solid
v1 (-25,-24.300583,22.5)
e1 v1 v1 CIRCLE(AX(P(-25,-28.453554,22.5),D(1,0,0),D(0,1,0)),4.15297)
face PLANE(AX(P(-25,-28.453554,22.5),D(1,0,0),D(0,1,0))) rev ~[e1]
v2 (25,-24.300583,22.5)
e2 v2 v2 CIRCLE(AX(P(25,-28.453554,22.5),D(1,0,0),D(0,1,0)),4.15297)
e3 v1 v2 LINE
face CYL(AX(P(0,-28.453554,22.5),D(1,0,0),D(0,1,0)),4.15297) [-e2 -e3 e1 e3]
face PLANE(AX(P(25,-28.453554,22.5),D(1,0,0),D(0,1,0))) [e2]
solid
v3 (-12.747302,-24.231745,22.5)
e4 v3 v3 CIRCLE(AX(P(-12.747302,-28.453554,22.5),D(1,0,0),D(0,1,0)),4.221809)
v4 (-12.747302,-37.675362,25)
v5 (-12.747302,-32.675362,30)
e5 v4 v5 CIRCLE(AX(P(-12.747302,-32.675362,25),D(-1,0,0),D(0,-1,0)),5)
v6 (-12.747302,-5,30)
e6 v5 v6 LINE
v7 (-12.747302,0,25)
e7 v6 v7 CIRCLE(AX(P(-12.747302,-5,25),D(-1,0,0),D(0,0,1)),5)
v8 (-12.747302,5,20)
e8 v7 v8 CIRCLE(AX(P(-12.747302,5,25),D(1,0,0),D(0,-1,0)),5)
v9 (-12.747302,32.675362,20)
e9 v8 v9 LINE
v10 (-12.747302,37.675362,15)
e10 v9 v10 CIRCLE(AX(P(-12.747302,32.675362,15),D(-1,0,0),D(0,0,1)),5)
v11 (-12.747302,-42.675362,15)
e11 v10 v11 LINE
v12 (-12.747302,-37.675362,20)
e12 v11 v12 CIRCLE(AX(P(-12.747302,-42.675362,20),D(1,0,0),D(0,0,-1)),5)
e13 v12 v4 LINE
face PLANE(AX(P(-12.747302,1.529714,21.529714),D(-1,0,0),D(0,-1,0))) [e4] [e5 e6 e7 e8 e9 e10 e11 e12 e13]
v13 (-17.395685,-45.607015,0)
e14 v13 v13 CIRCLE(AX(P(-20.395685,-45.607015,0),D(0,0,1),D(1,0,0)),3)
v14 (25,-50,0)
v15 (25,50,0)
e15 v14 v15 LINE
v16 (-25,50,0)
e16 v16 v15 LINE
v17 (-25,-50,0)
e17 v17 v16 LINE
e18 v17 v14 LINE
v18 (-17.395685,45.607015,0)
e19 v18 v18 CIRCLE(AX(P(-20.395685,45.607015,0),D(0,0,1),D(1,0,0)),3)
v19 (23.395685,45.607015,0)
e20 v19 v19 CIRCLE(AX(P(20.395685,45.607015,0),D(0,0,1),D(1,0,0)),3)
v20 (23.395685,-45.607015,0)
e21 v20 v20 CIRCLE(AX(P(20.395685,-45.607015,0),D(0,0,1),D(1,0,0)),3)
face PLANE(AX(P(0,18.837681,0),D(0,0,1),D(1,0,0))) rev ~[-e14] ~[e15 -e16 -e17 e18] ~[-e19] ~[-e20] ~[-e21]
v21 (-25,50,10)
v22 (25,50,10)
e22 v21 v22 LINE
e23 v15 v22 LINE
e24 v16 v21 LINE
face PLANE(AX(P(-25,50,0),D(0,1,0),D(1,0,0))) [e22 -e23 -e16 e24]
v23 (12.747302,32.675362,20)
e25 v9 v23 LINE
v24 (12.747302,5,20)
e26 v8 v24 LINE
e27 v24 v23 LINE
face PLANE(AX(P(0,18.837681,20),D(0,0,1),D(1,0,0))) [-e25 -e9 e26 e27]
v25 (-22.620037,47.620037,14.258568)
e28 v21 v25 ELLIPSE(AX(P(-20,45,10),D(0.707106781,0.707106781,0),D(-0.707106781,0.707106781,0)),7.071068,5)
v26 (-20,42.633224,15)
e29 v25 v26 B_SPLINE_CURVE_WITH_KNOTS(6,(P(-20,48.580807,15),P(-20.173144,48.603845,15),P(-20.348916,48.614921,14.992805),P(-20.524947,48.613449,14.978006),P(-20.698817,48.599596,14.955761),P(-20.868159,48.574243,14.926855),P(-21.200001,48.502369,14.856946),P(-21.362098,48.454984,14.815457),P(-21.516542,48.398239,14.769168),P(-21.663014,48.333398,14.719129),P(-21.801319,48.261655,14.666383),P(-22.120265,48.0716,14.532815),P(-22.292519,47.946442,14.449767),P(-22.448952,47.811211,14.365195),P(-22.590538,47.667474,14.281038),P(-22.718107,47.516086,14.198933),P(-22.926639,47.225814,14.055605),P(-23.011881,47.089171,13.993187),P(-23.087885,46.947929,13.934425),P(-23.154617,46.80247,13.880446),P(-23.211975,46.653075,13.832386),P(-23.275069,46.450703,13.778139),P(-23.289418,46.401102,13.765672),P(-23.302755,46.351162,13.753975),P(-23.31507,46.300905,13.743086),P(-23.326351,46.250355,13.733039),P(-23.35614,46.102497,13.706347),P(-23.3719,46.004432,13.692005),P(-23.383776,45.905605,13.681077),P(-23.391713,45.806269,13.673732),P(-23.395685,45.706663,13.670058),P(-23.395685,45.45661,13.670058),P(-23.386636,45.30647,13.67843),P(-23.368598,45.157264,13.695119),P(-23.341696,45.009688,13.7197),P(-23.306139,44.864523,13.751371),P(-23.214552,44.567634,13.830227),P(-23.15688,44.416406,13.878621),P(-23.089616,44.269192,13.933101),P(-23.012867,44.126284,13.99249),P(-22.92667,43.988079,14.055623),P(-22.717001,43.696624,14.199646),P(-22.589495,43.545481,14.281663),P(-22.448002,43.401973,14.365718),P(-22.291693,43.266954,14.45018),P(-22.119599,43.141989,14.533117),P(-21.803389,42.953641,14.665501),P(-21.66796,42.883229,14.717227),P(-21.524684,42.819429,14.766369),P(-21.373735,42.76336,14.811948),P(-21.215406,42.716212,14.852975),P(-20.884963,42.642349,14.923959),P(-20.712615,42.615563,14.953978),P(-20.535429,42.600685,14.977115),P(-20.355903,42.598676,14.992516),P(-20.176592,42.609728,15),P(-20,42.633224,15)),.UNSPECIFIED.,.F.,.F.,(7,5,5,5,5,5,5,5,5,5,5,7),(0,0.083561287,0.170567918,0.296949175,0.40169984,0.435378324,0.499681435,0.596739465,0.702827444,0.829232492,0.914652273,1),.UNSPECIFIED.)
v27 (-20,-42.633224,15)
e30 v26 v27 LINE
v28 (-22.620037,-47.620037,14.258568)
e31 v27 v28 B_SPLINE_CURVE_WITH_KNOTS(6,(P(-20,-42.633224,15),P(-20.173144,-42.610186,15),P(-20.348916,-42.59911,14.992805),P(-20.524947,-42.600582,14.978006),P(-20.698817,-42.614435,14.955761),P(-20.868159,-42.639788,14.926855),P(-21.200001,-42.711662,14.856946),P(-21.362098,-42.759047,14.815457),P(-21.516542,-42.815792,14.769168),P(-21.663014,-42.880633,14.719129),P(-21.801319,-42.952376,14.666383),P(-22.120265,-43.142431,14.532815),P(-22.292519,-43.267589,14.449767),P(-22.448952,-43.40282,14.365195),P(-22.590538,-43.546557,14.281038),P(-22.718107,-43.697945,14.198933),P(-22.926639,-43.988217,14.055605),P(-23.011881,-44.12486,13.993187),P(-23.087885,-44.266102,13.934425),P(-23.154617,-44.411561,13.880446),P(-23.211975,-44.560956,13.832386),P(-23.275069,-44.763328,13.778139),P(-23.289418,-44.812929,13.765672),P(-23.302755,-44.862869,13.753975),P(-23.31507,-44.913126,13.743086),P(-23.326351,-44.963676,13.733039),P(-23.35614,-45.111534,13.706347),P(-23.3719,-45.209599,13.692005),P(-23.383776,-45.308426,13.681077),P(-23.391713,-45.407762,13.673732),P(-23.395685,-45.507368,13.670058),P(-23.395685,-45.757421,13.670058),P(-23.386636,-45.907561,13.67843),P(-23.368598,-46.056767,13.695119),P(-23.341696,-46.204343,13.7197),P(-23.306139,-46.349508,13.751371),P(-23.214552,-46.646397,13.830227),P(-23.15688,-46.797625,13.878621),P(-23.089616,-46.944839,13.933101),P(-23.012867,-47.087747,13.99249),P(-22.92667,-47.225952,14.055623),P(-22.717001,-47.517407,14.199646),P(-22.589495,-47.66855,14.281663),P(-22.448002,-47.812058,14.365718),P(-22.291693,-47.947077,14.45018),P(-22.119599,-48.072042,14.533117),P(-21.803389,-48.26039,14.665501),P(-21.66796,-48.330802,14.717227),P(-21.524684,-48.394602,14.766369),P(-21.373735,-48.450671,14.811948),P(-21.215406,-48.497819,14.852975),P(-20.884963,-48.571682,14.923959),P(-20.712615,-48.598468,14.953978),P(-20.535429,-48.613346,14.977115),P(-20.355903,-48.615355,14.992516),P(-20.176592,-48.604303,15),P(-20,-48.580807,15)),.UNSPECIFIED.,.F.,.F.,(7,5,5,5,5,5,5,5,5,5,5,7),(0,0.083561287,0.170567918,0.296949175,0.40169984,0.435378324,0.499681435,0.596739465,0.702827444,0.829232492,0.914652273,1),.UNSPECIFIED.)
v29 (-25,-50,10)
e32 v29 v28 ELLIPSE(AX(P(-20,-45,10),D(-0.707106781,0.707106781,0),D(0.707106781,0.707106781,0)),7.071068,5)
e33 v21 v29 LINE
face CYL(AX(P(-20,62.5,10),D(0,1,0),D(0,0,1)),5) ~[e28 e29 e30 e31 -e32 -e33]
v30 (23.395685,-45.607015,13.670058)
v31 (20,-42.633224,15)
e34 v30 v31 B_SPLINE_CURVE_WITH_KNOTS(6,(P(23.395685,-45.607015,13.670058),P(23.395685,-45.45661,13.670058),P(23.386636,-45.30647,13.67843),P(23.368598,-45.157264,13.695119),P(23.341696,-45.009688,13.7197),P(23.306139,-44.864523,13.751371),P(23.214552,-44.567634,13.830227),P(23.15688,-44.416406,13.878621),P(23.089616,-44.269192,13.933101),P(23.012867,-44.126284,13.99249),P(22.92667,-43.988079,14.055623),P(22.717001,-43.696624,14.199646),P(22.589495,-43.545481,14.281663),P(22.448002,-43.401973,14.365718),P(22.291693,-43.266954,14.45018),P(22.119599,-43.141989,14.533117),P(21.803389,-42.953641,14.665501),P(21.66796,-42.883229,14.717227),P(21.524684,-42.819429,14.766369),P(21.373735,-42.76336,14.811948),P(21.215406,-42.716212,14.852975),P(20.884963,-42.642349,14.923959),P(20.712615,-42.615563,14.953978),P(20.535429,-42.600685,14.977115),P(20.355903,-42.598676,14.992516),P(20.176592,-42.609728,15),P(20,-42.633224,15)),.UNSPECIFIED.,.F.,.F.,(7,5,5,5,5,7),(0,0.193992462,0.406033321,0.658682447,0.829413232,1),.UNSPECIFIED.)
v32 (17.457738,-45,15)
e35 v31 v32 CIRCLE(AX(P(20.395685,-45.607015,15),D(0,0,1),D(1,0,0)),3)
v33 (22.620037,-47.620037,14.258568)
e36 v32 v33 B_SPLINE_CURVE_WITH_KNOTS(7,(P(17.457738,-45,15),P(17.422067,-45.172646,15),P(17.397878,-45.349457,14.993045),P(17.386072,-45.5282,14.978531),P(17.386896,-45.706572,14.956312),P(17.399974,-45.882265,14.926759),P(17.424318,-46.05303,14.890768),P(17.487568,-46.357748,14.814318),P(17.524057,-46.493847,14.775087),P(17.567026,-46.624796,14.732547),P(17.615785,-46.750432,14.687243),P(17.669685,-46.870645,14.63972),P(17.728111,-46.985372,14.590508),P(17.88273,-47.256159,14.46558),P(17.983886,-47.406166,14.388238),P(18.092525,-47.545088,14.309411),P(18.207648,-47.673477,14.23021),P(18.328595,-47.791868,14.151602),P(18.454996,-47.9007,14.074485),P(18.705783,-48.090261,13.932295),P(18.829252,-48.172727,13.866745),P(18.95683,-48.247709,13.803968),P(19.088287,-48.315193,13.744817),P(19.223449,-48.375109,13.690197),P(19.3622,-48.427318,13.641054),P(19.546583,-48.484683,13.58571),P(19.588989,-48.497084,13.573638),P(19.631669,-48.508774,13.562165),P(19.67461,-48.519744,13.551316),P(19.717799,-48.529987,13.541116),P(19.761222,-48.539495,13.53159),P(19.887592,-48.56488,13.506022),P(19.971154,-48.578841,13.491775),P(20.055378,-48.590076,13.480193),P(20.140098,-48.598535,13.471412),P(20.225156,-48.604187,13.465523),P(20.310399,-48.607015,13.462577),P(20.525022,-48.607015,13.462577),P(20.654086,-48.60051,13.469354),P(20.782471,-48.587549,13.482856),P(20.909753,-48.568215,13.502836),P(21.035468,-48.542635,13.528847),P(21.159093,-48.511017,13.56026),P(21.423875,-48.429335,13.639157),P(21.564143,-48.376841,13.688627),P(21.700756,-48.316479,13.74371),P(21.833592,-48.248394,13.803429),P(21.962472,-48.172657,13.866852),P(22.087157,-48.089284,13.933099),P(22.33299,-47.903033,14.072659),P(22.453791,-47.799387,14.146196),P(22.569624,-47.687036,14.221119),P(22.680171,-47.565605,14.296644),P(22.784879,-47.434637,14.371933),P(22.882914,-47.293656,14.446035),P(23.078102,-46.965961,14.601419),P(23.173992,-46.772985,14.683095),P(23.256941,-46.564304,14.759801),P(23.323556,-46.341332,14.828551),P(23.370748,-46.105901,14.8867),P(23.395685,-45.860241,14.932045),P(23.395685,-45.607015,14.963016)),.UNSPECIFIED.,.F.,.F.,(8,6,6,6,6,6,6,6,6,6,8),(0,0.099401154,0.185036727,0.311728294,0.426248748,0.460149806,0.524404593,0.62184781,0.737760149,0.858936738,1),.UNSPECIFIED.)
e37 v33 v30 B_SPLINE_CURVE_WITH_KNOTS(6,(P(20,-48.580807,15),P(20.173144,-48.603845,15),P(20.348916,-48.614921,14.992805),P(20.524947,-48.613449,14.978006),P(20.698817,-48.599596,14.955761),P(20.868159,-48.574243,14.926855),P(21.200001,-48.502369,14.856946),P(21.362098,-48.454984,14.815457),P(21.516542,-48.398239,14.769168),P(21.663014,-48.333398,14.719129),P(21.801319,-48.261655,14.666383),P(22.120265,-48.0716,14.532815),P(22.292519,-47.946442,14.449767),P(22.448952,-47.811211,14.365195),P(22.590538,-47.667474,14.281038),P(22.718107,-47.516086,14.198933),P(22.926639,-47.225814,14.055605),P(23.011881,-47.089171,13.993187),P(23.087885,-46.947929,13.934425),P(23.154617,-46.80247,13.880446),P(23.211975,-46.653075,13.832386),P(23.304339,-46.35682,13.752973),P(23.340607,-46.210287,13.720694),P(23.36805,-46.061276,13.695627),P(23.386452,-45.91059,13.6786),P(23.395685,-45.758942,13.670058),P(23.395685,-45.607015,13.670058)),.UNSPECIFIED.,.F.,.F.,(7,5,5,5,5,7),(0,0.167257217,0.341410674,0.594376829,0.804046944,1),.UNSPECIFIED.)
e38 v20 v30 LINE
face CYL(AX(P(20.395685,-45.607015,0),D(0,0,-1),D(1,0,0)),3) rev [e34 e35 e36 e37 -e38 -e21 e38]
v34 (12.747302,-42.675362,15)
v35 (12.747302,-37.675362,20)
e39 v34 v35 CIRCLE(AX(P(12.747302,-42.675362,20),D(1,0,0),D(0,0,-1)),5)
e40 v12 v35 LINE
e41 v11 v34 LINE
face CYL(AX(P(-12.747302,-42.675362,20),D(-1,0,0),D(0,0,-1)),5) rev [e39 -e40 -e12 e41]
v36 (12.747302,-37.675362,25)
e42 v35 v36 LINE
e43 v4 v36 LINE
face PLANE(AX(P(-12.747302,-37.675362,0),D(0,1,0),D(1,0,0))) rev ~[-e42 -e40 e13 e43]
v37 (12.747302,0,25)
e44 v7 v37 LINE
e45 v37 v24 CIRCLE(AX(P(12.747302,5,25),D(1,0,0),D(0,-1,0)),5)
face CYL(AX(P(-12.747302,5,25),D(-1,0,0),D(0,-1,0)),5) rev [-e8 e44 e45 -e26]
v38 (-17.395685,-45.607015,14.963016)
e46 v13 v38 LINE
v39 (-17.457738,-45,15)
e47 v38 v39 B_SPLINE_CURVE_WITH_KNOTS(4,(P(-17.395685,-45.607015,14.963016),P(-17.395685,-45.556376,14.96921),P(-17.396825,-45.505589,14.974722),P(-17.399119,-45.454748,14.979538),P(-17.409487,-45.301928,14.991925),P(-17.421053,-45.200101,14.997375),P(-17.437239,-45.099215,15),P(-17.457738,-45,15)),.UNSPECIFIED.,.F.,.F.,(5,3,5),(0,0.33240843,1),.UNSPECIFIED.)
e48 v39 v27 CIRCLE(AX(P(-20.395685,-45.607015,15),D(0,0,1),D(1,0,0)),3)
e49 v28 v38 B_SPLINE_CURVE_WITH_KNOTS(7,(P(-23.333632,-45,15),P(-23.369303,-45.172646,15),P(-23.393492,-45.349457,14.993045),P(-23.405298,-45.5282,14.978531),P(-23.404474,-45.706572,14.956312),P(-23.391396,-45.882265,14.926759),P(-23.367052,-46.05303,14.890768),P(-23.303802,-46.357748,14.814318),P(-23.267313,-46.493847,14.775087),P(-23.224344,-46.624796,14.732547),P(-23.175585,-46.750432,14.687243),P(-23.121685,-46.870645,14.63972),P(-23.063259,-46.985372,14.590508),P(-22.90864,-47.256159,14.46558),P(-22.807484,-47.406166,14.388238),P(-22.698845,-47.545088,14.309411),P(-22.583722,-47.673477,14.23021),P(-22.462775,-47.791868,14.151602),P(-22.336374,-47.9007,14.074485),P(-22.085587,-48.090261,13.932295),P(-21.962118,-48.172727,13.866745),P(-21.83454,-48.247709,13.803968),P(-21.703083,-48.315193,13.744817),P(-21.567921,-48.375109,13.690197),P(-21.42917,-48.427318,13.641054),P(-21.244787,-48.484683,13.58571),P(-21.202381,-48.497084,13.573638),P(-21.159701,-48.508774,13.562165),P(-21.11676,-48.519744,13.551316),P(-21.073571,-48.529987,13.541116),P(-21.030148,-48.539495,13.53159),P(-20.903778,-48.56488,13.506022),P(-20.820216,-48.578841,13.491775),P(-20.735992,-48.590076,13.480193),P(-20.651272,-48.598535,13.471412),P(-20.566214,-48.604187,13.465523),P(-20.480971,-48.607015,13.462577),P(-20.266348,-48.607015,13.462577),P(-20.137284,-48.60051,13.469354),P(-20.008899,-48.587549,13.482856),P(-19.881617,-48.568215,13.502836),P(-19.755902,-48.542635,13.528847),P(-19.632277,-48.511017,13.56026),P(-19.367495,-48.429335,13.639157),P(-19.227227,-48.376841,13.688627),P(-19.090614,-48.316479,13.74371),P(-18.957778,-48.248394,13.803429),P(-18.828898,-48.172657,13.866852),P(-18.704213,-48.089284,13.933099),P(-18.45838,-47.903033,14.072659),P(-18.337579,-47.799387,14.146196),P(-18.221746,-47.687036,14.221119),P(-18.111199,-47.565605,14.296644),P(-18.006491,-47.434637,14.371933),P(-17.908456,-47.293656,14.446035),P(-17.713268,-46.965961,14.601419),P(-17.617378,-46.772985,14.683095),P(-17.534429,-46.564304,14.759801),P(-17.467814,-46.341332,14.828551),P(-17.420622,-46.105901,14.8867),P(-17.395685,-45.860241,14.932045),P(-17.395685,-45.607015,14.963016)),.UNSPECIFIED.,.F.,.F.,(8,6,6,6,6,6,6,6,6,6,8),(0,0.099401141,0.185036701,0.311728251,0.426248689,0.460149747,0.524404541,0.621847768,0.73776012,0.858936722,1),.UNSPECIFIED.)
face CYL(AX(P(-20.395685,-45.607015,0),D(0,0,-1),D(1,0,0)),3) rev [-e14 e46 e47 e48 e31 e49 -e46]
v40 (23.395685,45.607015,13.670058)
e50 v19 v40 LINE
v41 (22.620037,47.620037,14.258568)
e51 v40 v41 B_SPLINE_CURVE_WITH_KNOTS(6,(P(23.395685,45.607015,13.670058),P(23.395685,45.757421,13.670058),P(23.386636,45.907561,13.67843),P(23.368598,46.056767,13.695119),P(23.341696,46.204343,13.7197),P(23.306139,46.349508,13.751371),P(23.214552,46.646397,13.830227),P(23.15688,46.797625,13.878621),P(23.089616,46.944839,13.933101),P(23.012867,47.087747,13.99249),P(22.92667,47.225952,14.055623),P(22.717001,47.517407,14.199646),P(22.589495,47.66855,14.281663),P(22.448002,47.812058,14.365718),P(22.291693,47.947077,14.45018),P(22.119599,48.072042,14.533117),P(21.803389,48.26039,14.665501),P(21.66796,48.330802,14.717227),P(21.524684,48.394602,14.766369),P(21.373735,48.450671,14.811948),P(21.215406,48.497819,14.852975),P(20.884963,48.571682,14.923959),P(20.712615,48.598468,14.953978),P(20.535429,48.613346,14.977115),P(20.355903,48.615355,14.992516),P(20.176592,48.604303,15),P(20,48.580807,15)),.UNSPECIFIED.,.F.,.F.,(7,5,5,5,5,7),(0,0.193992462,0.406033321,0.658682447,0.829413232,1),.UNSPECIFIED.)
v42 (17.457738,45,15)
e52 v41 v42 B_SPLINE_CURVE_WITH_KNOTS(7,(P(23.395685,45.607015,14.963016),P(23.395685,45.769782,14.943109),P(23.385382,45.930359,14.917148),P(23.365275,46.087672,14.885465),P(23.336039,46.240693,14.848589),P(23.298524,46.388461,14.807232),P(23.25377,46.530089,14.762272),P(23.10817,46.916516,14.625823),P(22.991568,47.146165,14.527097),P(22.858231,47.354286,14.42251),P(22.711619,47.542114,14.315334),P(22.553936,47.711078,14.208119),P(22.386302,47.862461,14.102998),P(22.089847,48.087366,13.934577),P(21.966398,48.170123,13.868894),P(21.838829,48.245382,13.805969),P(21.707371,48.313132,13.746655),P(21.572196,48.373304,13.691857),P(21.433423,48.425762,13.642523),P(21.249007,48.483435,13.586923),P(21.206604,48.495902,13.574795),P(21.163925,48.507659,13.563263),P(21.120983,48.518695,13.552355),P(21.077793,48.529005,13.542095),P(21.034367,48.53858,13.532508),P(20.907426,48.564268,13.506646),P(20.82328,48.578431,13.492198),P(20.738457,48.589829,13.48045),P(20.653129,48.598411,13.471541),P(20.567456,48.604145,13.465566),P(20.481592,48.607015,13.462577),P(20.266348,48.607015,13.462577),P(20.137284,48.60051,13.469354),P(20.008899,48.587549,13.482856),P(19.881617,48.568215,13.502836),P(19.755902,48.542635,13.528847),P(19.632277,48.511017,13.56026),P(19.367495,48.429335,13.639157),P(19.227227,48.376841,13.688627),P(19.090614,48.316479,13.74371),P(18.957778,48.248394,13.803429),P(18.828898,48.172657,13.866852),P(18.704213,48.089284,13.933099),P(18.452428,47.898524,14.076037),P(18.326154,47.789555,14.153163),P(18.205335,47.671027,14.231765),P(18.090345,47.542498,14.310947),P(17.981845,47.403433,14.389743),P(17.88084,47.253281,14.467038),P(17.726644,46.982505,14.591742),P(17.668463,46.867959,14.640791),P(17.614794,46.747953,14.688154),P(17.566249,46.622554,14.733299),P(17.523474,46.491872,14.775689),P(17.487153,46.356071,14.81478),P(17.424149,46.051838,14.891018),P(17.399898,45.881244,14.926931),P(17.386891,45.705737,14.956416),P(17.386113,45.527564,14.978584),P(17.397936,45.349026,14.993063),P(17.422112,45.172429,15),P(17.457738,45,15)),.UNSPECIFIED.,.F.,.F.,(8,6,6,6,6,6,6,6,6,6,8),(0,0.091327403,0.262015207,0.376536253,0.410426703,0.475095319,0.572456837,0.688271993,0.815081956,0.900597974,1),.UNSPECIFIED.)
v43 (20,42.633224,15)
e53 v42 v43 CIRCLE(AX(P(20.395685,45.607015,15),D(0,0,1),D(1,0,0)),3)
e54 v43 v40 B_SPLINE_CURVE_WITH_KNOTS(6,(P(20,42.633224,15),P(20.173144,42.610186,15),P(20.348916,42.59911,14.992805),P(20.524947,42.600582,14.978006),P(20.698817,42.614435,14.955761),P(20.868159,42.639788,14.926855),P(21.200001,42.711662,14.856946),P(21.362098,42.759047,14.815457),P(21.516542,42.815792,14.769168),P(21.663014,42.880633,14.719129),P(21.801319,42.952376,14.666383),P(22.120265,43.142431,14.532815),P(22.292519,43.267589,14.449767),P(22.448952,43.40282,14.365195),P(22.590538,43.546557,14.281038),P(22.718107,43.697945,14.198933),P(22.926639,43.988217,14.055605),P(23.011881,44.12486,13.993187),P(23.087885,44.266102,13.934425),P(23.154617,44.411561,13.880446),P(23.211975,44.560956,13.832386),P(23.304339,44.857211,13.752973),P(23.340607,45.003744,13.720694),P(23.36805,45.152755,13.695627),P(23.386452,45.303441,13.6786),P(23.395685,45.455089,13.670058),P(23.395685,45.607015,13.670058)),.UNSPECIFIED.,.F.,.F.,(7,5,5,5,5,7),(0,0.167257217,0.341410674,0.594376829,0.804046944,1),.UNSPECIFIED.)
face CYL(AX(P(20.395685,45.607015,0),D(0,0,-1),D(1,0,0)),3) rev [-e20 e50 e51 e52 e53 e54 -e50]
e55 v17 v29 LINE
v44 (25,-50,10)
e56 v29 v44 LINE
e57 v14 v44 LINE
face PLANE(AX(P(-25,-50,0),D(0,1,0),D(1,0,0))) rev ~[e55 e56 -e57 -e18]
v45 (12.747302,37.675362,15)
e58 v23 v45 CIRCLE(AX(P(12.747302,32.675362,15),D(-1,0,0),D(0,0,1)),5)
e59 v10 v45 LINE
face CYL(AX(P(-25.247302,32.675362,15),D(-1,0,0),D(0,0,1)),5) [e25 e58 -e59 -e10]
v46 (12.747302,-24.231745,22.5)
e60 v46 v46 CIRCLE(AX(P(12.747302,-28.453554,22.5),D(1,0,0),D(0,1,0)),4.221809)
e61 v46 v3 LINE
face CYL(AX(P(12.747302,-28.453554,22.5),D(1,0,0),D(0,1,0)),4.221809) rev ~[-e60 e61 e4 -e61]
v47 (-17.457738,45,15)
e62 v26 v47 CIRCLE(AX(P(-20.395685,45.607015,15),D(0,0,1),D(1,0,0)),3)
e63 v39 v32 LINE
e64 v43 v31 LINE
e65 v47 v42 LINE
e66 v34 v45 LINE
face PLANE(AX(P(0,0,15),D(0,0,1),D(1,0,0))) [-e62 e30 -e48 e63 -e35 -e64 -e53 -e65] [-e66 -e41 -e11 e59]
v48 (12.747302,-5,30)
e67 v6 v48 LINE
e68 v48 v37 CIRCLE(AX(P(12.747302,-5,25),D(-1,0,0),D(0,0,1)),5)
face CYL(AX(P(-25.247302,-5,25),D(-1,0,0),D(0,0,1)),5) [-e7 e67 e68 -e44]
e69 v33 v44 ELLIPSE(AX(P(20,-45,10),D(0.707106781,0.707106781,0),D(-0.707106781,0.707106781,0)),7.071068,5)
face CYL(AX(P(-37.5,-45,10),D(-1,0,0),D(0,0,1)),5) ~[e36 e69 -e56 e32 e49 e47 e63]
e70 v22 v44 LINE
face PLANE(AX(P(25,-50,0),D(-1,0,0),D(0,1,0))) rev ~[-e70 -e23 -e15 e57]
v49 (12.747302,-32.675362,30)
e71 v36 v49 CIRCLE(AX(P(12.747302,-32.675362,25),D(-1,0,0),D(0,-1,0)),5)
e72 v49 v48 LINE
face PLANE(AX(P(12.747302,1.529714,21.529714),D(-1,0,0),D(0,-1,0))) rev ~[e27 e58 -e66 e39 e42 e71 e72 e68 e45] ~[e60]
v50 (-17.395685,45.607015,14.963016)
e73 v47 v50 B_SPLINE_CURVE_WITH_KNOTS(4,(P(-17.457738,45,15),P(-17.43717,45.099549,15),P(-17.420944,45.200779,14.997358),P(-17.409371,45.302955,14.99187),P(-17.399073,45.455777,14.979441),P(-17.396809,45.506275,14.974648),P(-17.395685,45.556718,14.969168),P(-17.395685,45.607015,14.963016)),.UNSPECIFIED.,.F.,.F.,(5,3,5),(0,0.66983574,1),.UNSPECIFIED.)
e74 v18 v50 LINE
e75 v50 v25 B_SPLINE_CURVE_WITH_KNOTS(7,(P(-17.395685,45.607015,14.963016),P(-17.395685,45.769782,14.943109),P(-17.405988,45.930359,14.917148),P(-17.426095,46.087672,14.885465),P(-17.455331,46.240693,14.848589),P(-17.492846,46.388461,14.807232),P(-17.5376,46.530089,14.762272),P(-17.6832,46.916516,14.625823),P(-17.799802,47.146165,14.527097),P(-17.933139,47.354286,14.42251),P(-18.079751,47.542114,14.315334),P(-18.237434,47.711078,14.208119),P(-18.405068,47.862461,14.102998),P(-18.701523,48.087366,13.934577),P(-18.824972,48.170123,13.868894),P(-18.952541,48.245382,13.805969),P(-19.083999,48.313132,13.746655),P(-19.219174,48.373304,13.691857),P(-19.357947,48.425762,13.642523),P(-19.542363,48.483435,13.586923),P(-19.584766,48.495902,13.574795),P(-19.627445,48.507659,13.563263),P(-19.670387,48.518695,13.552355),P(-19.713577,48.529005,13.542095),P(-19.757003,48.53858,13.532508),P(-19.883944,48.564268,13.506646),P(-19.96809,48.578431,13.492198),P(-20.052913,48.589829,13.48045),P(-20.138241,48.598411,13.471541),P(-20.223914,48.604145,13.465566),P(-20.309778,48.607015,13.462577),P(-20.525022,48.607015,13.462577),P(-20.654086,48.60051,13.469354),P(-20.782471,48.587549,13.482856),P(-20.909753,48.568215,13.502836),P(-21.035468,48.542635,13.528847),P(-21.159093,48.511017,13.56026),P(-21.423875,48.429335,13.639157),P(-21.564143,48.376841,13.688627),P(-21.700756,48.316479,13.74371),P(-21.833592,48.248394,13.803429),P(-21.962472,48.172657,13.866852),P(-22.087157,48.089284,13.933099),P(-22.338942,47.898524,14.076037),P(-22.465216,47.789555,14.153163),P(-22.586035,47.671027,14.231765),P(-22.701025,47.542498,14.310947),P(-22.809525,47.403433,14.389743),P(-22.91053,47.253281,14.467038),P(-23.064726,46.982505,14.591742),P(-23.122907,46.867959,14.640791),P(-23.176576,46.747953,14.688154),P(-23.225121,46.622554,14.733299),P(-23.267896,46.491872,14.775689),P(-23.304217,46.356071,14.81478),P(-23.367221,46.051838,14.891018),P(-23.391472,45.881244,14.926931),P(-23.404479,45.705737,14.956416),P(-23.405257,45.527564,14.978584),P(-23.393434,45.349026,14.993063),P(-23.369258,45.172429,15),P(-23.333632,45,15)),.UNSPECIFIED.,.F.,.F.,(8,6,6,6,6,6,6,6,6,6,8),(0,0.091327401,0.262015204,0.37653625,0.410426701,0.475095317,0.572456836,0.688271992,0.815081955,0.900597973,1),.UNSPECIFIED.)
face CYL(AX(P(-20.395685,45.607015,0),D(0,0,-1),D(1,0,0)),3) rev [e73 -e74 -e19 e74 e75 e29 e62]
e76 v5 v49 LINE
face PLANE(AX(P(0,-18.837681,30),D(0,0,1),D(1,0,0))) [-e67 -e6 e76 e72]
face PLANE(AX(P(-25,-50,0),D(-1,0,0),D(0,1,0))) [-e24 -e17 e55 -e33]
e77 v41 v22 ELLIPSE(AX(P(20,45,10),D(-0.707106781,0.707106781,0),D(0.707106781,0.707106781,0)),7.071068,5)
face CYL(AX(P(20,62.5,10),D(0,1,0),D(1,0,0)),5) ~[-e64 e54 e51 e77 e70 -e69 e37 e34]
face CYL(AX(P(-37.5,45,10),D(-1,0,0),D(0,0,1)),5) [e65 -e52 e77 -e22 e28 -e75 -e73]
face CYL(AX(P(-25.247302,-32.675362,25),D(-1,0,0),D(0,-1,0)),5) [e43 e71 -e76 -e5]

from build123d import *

# Parameters (mm, degrees)
F0_W        = 50
F0_H        = 100
F0_R        = 3
F1_DEPTH    = 15
F0_W_2      = 25.4946034402
F0_H_2      = 37.6753620803
F2_DEPTH    = 20
F3_DEPTH    = 30
F4_T1_DEPTH = 25.4946034402
F4_T3_DEPTH = 50.4946034402
F4_T5_DEPTH = 125
F4_T7_DEPTH = 75
F5_R        = 4.2218085751
F6_DEPTH    = 31.6
F7_R        = 4.1529704456
F8_DEPTH    = 25


# Not quite as in the source:
# - a fillet or chamfer that OpenCascade refuses, or shapes differently, is made with other operations: its cross-section is extruded or revolved along the edge and cut away or added


with BuildPart() as f1:
    # F0 (on Top) → F1 (new body)
    with BuildSketch(Plane.XY):
        Rectangle(F0_W, F0_H)
        with Locations((-20.3956849873, -45.6070154905)):
            Circle(F0_R, mode=Mode.SUBTRACT)
        with Locations((20.3956849873, -45.6070154905)):
            Circle(F0_R, mode=Mode.SUBTRACT)
        with Locations((-20.3956849873, 45.6070154905)):
            Circle(F0_R, mode=Mode.SUBTRACT)
        Polygon((-12.7473017201, 37.6753620803), (12.7473017201, 37.6753620803), (12.7473017201, 0), (12.7473017201, -37.6753620803), (-12.7473017201, -37.6753620803), (-12.7473017201, 0), align=None, mode=Mode.SUBTRACT)
        with Locations((20.3956849873, 45.6070154905)):
            Circle(F0_R, mode=Mode.SUBTRACT)
    extrude(amount=F1_DEPTH)

    # F0 (on Top) → F2 (join)
    with BuildSketch(Plane.XY):
        with Locations((0, 18.8376810402)):
            Rectangle(F0_W_2, F0_H_2)
    extrude(amount=F2_DEPTH)

    # F0 (on Top) → F3 (join)
    with BuildSketch(Plane.XY):
        with Locations((0, -18.8376810402)):
            Rectangle(F0_W_2, F0_H_2)
    extrude(amount=F3_DEPTH)

    # F4: fillet of radius 5 on 9 edges, made by hand

    # F4_s2 → F4_t1 (join)
    with BuildSketch(Plane.YZ.offset(-12.7473017201)):
        with BuildLine():
            ThreePointArc((0, 25), (1.4644660941, 21.4644660941), (5, 20))
            Line((5, 20), (0, 20))
            Line((0, 20), (0, 25))
        make_face()
        with BuildLine():
            ThreePointArc((-42.6753620803, 15), (-39.1398281744, 16.4644660941), (-37.6753620803, 20))
            Line((-37.6753620803, 20), (-37.6753620803, 15))
            Line((-37.6753620803, 15), (-42.6753620803, 15))
        make_face()
    extrude(amount=F4_T1_DEPTH)

    # F4_s4 → F4_t3 (cut)
    with BuildSketch(Plane.YZ.offset(-25.2473017201)):
        with BuildLine():
            ThreePointArc((-5, 30), (-1.4644660941, 28.5355339059), (0, 25))
            Line((0, 25), (0, 30))
            Line((0, 30), (-5, 30))
        make_face()
        with BuildLine():
            ThreePointArc((32.6753620803, 20), (36.2108959863, 18.5355339059), (37.6753620803, 15))
            Line((37.6753620803, 15), (37.6753620803, 20))
            Line((37.6753620803, 20), (32.6753620803, 20))
        make_face()
        with BuildLine():
            ThreePointArc((-37.6753620803, 25), (-36.2108959863, 28.5355339059), (-32.6753620803, 30))
            Line((-32.6753620803, 30), (-37.6753620803, 30))
            Line((-37.6753620803, 30), (-37.6753620803, 25))
        make_face()
    extrude(amount=F4_T3_DEPTH, mode=Mode.SUBTRACT)

    # F4_s6 → F4_t5 (cut)
    with BuildSketch(Plane.XZ.offset(-62.5)):
        with BuildLine():
            ThreePointArc((-20, 15), (-23.5355339059, 13.5355339059), (-25, 10))
            Line((-25, 10), (-25, 15))
            Line((-25, 15), (-20, 15))
        make_face()
        with BuildLine():
            ThreePointArc((25, 10), (23.5355339059, 13.5355339059), (20, 15))
            Line((20, 15), (25, 15))
            Line((25, 15), (25, 10))
        make_face()
    extrude(amount=F4_T5_DEPTH, mode=Mode.SUBTRACT)

    # F4_s8 → F4_t7 (cut)
    with BuildSketch(Plane.YZ.offset(-37.5)):
        with BuildLine():
            ThreePointArc((-45, 15), (-48.5355339059, 13.5355339059), (-50, 10))
            Line((-50, 10), (-50, 15))
            Line((-50, 15), (-45, 15))
        make_face()
        with BuildLine():
            ThreePointArc((45, 15), (48.5355339059, 13.5355339059), (50, 10))
            Line((50, 10), (50, 15))
            Line((50, 15), (45, 15))
        make_face()
    extrude(amount=F4_T7_DEPTH, mode=Mode.SUBTRACT)

    # F5 (on face) → F6 (cut)
    with BuildSketch(Plane.YZ.offset(12.7473017201)):
        with Locations((-28.4535535052, 22.5)):
            Circle(F5_R)
    extrude(amount=-F6_DEPTH, mode=Mode.SUBTRACT)


with BuildPart() as f8:
    # F7 (on Right) → F8 (new body, symmetric)
    with BuildSketch(Plane.YZ):
        with Locations((-28.4535535052, 22.5)):
            Circle(F7_R)
    extrude(amount=F8_DEPTH, both=True)


solid = Compound([f1.part, f8.part])
